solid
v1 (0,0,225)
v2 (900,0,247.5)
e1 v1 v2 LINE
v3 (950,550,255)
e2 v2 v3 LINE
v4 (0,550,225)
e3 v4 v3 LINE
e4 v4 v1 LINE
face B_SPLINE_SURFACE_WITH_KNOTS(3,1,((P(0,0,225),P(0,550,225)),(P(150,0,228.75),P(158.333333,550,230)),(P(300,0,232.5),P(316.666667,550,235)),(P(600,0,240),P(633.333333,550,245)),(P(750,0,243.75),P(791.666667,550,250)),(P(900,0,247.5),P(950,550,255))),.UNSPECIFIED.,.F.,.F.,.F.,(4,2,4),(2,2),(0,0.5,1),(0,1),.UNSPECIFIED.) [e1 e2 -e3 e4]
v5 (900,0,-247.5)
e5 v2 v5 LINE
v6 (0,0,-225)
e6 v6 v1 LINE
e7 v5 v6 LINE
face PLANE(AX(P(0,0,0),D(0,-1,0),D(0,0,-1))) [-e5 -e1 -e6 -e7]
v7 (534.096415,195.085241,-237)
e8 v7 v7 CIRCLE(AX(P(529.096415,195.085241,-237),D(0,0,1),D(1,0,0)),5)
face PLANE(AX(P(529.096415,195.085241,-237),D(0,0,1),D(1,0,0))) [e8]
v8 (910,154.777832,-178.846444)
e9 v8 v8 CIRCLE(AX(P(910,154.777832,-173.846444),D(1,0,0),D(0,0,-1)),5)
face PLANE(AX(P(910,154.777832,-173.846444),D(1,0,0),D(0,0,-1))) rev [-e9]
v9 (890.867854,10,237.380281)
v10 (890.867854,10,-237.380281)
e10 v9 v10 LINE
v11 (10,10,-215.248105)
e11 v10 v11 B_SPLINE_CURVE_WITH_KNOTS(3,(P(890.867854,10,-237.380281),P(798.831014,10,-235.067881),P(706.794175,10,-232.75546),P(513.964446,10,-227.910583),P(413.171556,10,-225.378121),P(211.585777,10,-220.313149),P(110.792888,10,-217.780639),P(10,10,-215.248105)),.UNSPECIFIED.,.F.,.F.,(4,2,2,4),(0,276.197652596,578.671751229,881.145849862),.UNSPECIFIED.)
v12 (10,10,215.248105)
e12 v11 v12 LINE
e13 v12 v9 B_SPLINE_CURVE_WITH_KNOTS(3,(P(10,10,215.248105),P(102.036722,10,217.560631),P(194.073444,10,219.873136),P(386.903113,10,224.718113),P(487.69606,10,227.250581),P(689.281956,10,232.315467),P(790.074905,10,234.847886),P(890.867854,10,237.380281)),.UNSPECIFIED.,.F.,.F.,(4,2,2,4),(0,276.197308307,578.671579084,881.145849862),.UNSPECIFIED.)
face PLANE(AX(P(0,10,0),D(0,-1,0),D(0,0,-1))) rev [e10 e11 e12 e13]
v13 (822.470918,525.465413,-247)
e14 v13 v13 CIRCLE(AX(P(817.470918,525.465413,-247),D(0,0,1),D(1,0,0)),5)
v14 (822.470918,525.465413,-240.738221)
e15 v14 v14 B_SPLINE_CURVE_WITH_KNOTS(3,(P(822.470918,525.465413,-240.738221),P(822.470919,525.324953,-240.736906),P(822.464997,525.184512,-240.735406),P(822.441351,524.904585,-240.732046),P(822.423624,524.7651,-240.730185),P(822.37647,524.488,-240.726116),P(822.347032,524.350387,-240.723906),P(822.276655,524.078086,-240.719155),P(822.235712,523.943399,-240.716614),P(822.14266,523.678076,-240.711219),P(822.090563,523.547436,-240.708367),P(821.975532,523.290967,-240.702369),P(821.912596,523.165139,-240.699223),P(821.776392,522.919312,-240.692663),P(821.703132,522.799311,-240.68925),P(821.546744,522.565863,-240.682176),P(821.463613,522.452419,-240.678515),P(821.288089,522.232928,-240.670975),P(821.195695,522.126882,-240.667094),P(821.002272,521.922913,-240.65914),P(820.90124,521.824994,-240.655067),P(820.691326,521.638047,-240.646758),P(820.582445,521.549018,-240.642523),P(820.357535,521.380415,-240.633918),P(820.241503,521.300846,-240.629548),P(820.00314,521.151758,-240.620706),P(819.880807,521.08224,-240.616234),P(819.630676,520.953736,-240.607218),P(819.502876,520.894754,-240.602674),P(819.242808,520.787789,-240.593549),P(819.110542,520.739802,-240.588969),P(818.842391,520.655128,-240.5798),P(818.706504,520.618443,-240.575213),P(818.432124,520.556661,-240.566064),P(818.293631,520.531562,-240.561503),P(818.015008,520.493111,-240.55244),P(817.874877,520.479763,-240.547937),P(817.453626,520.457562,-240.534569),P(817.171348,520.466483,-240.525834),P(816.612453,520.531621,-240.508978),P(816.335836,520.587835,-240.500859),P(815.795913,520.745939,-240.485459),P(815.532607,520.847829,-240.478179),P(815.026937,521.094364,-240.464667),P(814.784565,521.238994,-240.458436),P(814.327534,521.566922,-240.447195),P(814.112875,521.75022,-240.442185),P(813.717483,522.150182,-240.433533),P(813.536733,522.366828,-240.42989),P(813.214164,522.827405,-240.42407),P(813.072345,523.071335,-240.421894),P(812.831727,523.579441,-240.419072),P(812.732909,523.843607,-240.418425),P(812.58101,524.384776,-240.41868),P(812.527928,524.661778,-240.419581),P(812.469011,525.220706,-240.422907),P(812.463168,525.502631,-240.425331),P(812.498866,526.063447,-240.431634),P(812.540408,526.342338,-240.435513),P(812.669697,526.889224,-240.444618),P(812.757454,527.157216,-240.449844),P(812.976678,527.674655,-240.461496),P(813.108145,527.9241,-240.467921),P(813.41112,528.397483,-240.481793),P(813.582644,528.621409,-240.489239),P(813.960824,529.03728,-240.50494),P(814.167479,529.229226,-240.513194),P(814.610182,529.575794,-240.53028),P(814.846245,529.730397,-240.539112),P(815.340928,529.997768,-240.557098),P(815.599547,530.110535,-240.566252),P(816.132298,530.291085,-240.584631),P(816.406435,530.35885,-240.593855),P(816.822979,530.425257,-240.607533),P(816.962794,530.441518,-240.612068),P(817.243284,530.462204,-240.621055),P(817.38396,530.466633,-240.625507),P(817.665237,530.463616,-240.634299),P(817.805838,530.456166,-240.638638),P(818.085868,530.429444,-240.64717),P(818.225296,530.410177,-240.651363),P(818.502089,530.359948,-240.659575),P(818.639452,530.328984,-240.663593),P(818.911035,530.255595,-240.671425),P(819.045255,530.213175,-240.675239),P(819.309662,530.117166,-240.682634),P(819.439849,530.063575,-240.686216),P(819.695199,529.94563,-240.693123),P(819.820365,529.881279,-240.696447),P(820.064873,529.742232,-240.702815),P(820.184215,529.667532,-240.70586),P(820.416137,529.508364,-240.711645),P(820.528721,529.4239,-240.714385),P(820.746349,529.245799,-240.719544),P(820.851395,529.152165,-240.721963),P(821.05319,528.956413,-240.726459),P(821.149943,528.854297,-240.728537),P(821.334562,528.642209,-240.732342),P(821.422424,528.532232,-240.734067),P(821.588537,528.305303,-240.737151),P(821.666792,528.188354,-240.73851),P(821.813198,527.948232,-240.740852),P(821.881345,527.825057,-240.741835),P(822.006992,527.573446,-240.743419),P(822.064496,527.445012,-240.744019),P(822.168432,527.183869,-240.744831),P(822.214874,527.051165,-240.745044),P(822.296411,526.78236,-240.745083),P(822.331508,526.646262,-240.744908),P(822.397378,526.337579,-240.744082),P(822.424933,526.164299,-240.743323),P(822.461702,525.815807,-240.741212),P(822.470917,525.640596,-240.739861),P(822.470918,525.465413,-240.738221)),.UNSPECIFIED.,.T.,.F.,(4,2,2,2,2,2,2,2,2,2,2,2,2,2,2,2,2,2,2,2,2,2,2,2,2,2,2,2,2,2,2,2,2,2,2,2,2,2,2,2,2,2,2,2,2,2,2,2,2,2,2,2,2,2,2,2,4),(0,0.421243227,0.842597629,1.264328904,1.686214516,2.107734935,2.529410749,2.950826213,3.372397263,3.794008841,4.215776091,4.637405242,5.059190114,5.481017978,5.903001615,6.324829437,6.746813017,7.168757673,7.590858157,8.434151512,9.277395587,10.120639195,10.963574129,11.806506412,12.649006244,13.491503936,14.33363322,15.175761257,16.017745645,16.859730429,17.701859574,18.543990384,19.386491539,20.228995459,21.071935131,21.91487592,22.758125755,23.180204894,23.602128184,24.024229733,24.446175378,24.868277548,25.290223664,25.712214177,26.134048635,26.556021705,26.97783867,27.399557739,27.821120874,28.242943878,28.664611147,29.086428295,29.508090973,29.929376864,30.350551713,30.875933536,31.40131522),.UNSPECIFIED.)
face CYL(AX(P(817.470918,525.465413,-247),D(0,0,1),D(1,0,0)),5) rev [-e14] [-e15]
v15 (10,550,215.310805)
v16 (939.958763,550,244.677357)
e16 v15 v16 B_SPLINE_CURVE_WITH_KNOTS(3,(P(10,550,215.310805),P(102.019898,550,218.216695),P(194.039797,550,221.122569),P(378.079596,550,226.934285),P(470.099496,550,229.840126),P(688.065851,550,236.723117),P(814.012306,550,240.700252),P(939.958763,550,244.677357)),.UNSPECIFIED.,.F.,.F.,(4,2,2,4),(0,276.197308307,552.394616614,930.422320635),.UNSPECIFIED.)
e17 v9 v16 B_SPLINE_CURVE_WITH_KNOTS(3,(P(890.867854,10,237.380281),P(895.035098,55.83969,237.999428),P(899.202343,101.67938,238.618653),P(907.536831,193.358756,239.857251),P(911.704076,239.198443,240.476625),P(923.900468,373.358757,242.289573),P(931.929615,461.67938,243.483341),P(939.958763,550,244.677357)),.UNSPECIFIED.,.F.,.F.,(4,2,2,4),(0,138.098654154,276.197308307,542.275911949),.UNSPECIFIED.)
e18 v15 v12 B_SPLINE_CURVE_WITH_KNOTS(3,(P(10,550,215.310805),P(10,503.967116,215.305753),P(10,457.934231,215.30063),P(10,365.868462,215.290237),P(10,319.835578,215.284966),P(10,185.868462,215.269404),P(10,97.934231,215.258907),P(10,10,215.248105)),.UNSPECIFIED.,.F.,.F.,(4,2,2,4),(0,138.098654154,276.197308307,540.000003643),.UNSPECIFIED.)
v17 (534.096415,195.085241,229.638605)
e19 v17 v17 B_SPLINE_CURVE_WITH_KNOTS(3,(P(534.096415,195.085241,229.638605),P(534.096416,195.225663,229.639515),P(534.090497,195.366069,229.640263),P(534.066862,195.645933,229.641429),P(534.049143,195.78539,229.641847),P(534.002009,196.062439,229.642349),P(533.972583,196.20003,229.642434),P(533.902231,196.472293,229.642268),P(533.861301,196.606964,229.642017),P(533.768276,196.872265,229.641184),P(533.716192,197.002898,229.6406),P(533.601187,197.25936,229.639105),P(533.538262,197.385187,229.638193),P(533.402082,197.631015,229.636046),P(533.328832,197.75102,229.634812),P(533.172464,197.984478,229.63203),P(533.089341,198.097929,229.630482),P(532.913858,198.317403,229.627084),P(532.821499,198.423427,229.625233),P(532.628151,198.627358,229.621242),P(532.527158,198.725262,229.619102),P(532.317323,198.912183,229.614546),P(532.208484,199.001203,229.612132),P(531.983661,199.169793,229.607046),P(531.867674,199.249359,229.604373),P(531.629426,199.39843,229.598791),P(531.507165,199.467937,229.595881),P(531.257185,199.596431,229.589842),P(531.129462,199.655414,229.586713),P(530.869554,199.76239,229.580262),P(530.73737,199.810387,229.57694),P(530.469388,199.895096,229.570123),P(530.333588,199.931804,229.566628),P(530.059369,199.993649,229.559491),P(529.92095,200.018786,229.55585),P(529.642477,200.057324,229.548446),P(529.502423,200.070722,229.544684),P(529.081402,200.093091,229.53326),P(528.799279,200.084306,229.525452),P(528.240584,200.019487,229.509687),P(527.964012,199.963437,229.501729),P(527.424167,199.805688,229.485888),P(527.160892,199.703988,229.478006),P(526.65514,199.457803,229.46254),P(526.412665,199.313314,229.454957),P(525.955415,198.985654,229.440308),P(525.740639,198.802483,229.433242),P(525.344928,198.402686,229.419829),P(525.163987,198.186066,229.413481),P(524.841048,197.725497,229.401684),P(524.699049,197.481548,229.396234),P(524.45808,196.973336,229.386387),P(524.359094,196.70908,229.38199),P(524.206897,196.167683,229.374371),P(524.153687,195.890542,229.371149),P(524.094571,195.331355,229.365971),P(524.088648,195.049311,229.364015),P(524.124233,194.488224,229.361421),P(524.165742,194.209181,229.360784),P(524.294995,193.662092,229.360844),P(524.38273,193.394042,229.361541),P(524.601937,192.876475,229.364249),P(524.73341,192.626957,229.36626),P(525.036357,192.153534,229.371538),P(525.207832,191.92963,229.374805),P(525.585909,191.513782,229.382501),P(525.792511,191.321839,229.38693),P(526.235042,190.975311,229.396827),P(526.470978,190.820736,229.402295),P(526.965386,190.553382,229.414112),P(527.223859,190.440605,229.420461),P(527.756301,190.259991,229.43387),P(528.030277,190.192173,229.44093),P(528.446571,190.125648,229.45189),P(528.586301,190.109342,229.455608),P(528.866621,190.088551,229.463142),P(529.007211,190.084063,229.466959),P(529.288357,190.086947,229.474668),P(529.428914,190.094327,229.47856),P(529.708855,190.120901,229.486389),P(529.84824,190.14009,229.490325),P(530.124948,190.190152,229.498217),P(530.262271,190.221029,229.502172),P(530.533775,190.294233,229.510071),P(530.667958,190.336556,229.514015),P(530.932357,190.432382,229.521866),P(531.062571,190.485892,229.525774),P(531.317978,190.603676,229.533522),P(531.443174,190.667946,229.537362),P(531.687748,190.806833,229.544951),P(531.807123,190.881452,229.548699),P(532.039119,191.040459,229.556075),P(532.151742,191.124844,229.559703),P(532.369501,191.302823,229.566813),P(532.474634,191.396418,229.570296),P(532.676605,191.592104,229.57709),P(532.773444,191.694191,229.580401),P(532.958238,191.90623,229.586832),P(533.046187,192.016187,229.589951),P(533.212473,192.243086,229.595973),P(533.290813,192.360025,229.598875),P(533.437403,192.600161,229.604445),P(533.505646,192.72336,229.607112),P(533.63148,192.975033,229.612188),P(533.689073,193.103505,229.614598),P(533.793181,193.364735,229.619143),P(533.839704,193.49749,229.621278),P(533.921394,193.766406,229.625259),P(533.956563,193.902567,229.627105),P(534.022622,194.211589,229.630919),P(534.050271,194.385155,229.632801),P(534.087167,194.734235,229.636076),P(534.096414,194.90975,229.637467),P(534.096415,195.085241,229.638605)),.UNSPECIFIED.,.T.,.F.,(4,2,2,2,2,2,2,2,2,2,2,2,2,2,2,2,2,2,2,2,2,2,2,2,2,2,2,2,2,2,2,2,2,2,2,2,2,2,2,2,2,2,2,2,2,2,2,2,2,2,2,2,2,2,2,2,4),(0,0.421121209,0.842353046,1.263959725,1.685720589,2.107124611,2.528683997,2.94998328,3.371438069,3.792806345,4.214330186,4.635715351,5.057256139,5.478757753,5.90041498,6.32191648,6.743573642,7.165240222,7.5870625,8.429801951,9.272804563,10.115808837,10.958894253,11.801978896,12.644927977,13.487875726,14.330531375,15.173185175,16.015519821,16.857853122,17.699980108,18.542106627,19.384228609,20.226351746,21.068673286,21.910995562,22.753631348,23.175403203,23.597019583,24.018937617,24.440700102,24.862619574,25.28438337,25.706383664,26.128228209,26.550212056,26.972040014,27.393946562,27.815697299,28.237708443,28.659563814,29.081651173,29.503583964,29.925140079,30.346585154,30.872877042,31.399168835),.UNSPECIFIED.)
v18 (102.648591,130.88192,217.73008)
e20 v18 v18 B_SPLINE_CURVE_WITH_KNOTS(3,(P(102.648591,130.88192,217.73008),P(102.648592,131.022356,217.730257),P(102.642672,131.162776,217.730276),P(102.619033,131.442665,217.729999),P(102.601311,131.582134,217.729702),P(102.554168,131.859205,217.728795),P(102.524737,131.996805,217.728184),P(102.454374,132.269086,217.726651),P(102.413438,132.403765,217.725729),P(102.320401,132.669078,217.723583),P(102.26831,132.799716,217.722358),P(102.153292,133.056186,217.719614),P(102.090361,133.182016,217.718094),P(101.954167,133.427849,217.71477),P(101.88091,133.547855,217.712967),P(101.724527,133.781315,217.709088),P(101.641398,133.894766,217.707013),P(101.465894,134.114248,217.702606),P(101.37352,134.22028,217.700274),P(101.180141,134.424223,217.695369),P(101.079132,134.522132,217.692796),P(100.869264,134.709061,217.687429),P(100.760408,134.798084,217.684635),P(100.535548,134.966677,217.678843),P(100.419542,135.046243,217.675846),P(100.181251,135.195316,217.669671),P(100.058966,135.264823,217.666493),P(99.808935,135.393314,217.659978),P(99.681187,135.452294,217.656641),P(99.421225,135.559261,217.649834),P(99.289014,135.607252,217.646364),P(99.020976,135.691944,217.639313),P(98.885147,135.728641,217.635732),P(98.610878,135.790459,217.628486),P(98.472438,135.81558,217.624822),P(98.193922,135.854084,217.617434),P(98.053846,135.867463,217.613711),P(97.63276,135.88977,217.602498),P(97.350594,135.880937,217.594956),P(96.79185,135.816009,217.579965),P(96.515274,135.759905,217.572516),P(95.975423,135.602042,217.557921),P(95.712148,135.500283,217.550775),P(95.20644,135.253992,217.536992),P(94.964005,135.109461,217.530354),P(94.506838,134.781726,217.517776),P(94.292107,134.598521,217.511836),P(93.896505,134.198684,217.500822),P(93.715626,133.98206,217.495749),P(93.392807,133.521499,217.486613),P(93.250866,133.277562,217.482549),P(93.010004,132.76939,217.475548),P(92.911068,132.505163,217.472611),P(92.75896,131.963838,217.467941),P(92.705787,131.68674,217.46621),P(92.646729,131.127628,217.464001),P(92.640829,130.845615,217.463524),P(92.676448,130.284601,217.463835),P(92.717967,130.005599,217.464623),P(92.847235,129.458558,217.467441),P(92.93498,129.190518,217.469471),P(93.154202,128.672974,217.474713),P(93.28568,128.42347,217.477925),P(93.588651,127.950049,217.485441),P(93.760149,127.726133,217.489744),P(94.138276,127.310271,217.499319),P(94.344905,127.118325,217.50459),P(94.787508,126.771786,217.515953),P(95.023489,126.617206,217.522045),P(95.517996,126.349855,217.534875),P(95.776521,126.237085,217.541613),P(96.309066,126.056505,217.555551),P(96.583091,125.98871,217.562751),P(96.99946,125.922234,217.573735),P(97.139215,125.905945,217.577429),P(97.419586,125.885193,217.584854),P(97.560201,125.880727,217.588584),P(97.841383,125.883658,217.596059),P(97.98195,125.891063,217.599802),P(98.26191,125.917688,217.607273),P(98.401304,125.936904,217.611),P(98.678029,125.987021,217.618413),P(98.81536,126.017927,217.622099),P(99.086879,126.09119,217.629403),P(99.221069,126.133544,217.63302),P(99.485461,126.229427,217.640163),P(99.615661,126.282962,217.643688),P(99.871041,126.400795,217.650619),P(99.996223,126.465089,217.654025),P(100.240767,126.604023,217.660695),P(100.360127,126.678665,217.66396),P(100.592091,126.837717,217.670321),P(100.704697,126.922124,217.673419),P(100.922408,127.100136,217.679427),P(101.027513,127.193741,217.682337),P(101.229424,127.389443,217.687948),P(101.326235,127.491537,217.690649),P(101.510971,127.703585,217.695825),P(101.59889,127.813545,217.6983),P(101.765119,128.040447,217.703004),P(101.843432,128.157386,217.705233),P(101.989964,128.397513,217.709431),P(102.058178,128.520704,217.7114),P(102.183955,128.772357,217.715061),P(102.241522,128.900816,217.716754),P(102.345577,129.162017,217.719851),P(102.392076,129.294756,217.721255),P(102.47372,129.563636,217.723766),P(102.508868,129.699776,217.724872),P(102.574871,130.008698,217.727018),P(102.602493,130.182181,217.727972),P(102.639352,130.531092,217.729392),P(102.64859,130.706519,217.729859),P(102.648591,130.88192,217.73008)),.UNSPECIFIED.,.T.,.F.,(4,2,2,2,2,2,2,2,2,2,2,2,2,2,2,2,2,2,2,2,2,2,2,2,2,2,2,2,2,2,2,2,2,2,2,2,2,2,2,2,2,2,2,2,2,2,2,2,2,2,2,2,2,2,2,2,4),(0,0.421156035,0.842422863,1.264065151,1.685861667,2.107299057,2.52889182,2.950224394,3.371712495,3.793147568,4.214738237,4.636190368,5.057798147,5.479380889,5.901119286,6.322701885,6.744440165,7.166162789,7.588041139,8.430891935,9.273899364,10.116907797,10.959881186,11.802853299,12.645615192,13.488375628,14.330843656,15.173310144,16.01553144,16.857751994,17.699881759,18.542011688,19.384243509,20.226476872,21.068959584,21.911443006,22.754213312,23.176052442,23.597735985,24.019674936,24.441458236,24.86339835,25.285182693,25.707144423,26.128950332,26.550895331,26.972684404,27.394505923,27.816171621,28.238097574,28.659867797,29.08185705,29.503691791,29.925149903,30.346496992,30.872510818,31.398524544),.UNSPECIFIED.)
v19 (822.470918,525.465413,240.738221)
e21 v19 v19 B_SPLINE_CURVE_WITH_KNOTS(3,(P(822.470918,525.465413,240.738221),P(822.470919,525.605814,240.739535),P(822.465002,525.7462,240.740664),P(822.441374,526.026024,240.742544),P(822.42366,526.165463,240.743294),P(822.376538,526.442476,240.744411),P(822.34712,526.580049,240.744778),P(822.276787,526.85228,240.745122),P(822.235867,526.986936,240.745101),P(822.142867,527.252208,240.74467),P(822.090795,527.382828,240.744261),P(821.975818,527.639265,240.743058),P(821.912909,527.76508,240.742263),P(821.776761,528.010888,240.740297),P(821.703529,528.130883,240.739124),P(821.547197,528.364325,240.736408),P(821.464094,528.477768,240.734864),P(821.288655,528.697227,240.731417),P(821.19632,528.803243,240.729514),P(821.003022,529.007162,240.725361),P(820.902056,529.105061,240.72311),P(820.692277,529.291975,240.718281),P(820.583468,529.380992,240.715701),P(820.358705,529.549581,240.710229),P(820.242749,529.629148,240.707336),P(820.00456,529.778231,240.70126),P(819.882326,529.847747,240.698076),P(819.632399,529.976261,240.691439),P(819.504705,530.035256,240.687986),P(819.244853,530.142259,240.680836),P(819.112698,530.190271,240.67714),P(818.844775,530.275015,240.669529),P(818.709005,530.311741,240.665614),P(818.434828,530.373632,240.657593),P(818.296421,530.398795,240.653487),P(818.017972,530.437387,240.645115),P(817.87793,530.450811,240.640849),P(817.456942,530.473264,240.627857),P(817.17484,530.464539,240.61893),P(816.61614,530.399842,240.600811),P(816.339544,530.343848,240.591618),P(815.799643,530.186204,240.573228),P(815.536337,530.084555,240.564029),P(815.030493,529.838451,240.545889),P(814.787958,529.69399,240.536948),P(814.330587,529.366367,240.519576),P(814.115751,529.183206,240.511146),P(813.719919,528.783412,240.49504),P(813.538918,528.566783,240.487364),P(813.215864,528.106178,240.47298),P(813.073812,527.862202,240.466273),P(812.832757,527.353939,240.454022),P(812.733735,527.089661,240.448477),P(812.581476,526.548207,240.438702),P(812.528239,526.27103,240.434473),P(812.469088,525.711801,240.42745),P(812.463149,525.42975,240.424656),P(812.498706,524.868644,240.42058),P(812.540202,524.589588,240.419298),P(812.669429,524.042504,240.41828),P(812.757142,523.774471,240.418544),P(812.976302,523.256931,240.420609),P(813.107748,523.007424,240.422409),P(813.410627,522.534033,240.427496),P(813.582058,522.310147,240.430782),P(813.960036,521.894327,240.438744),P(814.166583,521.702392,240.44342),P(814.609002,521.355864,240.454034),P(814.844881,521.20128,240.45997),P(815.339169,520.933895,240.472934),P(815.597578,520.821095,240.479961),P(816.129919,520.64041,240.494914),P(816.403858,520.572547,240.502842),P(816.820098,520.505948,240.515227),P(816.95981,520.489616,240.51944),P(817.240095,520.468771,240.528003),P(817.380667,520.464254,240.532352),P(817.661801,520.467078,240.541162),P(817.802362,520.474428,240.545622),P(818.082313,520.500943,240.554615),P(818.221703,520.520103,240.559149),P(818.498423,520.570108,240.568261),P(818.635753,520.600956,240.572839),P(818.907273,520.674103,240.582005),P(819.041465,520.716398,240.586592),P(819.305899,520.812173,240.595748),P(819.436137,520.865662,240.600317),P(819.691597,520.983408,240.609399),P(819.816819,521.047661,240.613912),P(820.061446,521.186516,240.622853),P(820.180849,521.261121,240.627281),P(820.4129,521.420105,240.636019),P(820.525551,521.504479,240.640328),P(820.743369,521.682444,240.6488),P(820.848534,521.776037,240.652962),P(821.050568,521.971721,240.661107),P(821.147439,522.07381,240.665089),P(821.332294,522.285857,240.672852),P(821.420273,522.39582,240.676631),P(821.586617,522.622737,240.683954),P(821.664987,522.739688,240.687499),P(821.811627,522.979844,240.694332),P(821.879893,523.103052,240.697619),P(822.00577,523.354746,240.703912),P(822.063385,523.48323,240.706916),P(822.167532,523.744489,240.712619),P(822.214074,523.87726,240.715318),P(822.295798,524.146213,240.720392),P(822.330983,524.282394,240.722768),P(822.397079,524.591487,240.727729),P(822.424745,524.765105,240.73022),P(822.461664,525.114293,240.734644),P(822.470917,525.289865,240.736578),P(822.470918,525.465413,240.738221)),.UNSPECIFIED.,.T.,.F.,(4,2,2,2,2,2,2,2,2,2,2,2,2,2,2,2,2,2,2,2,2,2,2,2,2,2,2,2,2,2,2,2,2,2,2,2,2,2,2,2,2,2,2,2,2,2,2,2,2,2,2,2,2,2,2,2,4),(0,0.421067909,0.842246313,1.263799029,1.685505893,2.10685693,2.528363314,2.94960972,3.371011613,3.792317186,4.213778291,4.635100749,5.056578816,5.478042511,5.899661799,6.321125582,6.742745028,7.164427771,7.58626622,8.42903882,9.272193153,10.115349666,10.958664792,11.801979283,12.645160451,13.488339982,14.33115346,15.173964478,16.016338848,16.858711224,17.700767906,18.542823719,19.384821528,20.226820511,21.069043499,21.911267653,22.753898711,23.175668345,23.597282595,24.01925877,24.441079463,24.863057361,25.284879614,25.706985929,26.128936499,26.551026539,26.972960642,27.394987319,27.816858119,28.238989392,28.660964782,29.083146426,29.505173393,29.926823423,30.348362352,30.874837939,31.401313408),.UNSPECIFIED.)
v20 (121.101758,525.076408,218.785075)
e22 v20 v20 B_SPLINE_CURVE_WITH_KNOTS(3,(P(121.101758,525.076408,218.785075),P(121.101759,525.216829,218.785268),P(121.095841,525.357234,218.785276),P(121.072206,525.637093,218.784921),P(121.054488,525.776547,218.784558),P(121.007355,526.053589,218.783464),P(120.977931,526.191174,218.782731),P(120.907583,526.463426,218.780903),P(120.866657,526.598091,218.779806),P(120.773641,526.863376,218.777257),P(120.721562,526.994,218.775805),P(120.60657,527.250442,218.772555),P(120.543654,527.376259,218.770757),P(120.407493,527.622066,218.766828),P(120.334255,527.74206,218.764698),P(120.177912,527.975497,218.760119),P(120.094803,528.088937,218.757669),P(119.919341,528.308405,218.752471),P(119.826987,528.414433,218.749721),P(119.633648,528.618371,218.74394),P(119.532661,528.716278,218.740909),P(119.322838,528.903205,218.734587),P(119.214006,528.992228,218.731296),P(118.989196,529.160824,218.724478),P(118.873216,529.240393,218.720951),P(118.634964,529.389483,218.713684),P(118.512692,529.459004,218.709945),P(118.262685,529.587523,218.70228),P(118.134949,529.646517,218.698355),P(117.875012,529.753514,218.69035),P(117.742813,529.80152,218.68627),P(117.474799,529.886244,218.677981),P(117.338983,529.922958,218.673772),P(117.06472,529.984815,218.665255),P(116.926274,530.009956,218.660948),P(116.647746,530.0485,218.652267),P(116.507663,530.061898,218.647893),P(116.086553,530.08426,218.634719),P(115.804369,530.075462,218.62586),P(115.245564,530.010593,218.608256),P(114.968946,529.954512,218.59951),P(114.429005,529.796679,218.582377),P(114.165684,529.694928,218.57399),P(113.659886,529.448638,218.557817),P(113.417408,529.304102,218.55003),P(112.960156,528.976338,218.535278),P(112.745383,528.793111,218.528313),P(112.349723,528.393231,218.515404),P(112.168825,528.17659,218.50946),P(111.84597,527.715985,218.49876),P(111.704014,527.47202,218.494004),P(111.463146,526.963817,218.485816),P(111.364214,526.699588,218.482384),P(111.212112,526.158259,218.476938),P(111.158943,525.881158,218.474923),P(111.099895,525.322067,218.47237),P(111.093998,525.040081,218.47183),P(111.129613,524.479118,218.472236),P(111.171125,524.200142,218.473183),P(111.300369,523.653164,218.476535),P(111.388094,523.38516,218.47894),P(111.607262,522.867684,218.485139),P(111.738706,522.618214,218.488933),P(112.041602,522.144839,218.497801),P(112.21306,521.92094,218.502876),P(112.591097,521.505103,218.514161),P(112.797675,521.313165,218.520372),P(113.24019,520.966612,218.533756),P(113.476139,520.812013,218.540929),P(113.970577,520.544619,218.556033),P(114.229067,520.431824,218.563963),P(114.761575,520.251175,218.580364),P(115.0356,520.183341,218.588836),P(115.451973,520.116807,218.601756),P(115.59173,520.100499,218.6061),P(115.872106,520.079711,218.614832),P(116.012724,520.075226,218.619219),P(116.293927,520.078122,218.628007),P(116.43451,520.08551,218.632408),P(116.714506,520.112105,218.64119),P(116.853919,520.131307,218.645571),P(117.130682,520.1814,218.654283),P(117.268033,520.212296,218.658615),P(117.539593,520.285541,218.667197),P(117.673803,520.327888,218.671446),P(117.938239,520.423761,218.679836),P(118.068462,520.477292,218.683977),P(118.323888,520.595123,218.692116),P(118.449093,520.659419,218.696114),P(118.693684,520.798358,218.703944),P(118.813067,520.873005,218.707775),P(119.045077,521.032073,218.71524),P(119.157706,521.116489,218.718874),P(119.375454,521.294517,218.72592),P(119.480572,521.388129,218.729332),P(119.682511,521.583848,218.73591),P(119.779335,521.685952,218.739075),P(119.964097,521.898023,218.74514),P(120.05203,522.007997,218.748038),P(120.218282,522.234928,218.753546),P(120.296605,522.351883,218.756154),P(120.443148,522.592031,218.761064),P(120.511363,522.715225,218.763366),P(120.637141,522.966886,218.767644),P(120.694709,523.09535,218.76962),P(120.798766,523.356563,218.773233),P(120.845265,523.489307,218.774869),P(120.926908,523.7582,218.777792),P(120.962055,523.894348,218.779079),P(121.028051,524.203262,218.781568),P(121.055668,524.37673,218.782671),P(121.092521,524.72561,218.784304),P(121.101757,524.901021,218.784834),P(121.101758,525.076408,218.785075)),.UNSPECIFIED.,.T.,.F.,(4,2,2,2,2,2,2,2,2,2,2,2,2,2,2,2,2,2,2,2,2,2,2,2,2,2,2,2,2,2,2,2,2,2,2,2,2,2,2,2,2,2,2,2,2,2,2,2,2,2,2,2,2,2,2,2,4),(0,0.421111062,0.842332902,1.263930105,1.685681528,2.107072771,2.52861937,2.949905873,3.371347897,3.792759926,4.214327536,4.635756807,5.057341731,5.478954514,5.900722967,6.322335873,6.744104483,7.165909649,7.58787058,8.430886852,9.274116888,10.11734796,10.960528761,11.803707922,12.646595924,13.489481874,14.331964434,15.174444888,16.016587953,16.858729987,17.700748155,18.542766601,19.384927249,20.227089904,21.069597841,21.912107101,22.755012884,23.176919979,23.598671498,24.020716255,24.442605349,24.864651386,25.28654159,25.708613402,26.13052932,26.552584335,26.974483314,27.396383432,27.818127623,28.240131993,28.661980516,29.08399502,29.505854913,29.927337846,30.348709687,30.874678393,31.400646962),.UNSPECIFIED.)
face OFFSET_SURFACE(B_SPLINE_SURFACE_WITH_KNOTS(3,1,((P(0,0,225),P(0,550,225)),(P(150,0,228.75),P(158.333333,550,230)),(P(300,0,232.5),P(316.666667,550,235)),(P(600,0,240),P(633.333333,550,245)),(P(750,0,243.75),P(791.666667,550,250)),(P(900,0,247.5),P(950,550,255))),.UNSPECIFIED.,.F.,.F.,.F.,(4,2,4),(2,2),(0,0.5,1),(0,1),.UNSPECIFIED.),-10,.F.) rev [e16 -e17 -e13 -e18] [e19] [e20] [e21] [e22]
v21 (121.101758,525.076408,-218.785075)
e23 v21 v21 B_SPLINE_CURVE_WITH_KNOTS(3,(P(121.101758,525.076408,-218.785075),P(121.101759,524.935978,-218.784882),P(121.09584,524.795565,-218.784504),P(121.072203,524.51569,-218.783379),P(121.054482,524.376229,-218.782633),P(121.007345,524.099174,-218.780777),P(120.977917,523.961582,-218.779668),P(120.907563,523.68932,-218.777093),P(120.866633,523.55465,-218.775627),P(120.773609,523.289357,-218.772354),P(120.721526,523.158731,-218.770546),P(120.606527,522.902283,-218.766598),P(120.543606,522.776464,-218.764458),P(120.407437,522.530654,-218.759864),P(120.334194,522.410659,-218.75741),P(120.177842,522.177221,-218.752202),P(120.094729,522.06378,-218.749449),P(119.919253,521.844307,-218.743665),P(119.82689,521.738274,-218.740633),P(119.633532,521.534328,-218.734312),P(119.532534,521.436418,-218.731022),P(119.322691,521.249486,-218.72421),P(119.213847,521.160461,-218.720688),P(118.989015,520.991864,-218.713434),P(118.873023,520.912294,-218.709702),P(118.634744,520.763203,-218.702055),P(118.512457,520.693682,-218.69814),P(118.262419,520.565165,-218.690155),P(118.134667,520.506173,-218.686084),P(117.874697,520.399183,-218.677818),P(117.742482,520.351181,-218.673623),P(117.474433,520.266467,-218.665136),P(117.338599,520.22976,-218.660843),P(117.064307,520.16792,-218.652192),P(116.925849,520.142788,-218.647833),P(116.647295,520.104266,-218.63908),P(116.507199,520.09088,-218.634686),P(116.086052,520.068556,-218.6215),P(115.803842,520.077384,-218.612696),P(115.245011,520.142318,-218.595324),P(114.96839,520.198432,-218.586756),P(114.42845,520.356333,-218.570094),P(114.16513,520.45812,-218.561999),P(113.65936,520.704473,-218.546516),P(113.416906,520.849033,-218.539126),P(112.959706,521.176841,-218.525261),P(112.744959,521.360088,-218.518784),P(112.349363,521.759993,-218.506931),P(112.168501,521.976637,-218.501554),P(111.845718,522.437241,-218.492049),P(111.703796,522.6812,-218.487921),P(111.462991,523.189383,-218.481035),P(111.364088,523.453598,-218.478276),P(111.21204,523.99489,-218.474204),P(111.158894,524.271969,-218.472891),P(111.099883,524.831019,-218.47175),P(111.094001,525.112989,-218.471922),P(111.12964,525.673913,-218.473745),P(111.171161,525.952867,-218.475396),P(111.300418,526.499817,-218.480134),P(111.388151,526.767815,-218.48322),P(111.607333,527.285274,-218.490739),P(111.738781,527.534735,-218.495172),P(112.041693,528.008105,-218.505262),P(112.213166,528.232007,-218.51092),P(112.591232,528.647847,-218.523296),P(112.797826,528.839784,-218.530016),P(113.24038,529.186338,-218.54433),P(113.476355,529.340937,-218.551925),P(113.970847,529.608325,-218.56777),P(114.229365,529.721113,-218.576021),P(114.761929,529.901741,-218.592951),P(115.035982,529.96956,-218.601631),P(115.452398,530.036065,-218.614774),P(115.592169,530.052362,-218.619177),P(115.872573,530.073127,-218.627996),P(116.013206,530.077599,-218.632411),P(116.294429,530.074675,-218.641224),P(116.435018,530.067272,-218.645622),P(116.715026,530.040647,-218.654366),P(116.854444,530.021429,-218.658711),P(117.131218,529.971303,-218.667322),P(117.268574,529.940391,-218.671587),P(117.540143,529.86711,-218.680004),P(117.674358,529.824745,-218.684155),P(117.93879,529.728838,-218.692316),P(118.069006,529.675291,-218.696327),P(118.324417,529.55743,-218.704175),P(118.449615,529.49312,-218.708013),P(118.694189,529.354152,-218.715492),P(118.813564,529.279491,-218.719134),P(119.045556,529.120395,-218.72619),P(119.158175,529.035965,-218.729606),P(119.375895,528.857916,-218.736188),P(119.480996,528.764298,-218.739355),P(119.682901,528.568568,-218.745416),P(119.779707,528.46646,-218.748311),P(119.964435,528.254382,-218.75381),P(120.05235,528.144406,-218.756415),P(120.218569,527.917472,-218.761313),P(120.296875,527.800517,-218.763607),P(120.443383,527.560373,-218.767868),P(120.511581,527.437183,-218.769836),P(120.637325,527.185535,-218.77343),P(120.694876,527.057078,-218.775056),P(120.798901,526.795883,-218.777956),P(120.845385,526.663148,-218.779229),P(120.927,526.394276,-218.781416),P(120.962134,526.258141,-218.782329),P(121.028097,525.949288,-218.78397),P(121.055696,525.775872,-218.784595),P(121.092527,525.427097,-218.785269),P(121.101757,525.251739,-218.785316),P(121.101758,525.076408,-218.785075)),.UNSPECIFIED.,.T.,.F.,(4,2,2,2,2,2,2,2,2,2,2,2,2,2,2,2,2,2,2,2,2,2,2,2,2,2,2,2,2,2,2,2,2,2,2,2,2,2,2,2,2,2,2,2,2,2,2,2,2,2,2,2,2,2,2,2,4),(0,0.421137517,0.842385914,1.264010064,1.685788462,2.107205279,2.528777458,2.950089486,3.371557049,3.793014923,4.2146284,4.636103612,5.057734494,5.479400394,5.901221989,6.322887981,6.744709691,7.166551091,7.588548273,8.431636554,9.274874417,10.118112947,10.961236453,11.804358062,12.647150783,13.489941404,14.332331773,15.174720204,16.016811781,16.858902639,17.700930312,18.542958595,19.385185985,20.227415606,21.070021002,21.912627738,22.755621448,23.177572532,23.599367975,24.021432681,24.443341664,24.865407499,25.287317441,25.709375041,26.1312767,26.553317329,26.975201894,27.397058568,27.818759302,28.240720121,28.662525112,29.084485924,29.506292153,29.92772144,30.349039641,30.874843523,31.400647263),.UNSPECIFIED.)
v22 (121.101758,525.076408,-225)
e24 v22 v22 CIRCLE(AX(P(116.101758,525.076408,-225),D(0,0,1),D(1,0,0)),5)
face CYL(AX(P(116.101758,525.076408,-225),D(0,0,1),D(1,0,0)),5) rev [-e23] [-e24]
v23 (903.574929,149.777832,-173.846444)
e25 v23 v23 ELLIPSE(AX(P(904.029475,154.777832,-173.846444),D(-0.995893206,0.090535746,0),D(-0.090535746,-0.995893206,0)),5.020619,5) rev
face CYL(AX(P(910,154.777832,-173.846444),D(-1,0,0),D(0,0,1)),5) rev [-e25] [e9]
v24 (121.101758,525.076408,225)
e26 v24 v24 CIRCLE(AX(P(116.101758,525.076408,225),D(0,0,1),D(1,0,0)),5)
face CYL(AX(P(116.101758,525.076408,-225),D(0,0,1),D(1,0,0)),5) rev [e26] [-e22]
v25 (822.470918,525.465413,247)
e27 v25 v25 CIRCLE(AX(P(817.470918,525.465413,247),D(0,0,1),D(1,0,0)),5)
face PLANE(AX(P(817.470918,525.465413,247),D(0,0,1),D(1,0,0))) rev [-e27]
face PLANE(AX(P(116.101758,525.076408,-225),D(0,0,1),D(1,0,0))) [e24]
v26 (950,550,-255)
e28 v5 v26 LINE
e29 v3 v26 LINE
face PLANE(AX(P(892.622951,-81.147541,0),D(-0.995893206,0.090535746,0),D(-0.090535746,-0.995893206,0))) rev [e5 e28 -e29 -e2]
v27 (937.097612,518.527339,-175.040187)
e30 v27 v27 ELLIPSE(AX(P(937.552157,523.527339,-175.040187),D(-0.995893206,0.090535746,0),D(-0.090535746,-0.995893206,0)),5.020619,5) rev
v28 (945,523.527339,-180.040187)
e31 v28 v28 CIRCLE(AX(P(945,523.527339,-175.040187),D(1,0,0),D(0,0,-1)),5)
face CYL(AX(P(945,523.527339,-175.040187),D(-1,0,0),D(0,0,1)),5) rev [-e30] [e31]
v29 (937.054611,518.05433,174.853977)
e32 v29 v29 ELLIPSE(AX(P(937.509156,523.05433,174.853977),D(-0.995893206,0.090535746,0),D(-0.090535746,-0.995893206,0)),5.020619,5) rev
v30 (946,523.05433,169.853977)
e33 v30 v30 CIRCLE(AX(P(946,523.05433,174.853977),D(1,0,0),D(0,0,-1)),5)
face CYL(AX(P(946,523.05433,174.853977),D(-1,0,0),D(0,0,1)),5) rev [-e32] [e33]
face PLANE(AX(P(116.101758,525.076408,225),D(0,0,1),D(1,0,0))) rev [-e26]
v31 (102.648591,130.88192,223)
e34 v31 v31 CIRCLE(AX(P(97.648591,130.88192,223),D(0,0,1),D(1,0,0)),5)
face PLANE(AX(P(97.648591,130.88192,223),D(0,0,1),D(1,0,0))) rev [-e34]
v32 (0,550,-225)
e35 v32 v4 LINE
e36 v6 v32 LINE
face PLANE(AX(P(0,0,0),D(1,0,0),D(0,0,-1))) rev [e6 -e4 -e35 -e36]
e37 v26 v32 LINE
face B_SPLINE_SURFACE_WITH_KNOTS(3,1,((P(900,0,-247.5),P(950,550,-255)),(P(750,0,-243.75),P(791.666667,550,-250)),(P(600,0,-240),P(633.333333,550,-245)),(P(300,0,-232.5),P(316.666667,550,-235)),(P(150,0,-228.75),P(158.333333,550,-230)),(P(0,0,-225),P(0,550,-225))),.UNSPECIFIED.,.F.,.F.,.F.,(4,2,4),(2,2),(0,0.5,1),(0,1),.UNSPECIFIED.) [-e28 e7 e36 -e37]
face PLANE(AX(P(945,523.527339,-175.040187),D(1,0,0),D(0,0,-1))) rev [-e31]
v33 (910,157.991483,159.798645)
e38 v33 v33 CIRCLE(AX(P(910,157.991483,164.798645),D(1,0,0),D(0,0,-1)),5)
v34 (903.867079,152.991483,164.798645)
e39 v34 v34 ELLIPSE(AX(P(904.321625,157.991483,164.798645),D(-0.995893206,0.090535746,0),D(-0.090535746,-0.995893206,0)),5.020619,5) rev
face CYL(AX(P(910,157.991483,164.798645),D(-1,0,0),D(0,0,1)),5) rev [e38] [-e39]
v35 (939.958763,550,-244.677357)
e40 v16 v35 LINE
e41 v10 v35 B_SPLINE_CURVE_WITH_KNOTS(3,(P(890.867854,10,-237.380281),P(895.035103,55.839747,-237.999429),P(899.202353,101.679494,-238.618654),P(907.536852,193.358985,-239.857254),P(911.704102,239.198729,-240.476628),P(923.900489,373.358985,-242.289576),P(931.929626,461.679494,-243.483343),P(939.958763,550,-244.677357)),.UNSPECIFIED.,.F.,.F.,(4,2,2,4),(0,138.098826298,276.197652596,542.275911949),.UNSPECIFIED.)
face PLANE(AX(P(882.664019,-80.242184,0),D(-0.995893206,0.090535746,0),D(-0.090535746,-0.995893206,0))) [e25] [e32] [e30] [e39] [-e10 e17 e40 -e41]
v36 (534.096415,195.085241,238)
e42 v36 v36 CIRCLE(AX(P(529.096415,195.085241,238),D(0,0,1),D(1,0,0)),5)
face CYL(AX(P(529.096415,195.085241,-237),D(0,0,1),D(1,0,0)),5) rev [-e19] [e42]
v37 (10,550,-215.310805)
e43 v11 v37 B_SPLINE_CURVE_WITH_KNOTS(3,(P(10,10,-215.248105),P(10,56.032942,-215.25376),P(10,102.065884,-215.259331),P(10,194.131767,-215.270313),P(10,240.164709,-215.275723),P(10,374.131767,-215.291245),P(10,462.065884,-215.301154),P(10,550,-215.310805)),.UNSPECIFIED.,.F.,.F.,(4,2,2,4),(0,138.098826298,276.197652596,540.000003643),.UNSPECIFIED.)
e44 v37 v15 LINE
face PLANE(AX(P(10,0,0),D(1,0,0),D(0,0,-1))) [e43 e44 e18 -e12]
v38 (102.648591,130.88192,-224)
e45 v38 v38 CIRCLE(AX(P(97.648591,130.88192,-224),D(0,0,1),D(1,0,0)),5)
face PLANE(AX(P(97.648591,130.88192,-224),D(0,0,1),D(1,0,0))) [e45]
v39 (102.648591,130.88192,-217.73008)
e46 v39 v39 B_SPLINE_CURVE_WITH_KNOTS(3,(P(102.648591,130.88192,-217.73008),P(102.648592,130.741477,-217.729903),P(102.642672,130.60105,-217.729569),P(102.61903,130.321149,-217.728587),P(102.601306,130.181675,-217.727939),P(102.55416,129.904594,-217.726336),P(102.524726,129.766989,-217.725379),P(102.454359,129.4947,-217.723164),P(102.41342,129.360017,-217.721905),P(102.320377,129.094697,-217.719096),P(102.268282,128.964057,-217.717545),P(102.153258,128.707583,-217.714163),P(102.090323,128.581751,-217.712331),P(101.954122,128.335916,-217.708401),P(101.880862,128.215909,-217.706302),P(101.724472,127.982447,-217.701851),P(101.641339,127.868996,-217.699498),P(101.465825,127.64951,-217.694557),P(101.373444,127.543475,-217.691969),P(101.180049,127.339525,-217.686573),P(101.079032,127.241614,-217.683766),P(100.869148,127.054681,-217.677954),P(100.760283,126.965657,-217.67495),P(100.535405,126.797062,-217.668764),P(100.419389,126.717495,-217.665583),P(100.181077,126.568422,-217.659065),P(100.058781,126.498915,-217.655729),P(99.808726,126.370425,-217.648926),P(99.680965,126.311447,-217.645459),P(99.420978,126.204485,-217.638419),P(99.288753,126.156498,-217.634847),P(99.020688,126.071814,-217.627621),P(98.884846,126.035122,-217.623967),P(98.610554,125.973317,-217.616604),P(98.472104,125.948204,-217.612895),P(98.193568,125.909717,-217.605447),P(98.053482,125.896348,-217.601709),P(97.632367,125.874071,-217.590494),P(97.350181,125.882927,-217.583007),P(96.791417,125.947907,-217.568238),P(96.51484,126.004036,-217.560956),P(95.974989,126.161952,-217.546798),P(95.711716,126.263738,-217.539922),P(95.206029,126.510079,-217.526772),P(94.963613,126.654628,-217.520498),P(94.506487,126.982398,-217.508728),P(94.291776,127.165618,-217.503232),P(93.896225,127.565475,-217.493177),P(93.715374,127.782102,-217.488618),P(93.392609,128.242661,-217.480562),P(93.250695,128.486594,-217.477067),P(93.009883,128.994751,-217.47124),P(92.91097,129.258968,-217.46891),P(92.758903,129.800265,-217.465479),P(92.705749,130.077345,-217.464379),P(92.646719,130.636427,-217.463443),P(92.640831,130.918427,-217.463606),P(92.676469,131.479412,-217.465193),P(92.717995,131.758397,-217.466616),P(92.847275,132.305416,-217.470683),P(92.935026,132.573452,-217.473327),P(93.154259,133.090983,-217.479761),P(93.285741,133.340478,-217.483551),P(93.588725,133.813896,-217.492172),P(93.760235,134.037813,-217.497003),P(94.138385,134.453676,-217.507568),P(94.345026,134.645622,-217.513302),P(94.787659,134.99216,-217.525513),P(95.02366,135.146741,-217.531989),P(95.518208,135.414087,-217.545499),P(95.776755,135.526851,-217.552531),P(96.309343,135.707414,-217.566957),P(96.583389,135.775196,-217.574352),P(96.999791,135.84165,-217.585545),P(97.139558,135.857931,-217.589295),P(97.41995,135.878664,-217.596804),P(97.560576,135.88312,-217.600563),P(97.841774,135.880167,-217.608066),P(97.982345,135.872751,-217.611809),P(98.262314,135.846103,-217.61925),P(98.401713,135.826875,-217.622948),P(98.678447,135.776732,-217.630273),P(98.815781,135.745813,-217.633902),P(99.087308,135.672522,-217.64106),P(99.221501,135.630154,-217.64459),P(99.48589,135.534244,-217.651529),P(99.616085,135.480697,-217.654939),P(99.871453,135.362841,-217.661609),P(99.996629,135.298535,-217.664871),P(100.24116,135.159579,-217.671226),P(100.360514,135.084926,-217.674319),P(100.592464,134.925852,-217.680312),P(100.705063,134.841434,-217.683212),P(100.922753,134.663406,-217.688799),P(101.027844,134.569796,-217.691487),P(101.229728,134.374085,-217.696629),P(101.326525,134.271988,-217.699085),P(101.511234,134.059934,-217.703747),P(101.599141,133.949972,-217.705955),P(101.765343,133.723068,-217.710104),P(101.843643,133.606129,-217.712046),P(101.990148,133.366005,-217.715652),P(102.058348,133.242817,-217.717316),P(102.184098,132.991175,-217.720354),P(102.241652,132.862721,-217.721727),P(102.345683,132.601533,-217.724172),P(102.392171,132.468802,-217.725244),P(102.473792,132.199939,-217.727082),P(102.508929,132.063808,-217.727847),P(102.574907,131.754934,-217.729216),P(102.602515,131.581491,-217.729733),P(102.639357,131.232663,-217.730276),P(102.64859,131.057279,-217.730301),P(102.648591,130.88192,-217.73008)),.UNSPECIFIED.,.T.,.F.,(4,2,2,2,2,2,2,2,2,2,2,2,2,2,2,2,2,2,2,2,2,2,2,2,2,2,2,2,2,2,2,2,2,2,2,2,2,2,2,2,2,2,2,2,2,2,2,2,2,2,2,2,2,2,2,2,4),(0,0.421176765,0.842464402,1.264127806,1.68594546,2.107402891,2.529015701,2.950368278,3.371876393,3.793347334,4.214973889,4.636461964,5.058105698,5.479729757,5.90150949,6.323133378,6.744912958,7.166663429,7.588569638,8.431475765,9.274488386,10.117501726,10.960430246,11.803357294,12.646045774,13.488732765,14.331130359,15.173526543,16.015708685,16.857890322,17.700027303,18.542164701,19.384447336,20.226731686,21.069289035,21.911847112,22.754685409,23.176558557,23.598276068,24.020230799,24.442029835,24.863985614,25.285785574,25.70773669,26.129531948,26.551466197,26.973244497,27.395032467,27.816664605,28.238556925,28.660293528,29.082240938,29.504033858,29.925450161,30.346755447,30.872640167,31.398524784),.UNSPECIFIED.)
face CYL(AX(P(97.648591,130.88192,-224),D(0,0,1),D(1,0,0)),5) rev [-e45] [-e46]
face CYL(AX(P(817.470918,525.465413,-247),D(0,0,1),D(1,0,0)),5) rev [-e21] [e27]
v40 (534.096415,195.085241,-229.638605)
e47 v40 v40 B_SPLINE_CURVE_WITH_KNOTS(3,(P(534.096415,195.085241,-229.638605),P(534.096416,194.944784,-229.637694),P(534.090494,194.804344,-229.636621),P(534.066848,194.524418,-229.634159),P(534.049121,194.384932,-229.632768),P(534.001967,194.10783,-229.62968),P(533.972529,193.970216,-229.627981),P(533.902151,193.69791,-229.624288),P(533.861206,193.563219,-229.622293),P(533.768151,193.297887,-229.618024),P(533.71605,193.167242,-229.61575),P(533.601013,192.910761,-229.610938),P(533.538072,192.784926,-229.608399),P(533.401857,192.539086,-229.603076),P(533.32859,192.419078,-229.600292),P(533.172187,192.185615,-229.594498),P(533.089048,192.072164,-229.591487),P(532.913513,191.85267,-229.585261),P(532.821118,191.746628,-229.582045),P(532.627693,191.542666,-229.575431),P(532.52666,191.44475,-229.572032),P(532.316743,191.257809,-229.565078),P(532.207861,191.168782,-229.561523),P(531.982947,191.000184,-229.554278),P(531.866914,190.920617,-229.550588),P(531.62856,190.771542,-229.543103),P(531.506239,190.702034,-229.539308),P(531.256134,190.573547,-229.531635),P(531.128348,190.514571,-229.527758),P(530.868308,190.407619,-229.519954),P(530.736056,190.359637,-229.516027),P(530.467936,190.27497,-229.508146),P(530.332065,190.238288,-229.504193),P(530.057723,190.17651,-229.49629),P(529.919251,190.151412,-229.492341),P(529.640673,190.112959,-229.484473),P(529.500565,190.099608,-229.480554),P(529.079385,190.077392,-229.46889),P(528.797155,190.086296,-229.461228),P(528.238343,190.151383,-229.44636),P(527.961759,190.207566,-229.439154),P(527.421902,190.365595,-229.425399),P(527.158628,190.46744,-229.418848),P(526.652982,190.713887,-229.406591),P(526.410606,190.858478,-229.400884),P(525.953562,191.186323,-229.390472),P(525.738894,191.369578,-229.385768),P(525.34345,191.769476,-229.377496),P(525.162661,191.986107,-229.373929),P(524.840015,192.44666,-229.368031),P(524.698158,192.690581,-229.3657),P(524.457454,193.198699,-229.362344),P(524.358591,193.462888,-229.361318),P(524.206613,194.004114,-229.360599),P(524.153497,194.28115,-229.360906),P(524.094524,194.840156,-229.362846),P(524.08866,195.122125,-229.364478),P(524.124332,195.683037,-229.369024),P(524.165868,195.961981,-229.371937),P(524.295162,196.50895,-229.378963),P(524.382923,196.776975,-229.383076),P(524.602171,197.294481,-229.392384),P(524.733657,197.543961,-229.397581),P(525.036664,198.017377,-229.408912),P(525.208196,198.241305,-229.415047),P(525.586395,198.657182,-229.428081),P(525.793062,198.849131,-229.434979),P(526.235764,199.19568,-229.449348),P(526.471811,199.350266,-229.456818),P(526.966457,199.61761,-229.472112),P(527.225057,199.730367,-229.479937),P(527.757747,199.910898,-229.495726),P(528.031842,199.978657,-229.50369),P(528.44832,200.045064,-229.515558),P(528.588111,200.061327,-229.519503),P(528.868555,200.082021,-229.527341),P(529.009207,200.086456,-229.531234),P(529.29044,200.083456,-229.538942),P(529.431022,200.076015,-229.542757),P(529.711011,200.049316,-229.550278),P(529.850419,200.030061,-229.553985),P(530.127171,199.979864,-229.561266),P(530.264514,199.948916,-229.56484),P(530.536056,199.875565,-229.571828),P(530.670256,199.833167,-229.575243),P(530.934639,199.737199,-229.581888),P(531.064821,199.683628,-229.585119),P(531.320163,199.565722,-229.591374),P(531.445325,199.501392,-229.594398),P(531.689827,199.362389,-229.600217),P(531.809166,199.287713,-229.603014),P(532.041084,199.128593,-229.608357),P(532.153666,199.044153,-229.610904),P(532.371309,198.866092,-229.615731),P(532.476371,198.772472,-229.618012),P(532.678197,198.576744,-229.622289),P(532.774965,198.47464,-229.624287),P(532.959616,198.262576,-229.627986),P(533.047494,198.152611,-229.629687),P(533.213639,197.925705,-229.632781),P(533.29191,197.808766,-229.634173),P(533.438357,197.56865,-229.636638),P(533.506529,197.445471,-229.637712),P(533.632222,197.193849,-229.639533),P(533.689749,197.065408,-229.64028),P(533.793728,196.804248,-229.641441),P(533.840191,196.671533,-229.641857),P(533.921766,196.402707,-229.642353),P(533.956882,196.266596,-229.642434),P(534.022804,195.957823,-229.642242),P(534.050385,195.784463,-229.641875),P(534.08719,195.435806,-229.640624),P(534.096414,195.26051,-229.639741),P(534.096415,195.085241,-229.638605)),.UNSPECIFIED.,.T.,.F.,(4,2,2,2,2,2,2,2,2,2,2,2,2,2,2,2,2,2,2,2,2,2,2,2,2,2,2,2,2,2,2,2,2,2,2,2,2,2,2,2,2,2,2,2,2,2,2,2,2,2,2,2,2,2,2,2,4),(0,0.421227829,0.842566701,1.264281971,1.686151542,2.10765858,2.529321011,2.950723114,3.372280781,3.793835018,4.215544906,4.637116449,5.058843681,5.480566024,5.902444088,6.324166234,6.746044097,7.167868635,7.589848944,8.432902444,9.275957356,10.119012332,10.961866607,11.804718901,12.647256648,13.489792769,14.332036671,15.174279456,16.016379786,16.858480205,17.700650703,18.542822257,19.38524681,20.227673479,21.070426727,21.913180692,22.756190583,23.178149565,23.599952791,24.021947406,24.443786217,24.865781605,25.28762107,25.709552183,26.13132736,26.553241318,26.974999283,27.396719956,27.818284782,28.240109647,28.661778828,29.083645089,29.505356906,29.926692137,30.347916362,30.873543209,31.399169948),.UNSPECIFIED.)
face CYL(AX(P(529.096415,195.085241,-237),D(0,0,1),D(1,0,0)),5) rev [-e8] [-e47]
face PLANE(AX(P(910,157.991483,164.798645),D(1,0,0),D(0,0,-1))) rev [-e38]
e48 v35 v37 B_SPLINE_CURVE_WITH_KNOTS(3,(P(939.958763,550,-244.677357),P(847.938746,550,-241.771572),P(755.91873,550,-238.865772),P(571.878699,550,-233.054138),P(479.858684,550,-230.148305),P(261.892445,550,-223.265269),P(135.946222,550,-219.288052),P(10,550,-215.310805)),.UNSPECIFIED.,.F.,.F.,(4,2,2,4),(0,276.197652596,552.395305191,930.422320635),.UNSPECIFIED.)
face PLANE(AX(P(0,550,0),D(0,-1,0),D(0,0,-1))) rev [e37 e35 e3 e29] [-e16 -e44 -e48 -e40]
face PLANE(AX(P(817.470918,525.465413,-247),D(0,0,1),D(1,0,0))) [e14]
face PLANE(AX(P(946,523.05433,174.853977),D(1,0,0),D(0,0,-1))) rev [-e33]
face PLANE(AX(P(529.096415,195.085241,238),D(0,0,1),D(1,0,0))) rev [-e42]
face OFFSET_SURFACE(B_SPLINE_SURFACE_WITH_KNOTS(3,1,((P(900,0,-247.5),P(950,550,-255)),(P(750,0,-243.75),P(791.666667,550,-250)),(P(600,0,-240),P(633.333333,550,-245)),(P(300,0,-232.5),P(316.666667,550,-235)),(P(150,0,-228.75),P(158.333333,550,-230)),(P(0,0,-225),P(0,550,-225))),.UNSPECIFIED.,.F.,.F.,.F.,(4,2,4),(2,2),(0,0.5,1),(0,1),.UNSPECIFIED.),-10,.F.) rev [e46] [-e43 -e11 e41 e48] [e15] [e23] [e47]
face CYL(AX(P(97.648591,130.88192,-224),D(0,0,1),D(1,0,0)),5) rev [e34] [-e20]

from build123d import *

# Parameters (mm, degrees)
CASCA4_T                = -10
CUT_EXTRUDE3_DEPTH      = 23
CUT_EXTRUDE3_DEPTH_BACK = 452
SKETCH3_R               = 5
CUT_EXTRUDE4_DEPTH      = 8
CUT_EXTRUDE4_DEPTH_BACK = 439
SKETCH4_R               = 5
SKETCH5_R               = 5
CUT_EXTRUDE5_DEPTH      = 55
SKETCH6_R               = 5
CUT_EXTRUDE6_DEPTH      = 56
SKETCH8_R               = 5
CUT_EXTRUDE7_DEPTH      = 20
SKETCH9_R               = 5
CUT_EXTRUDE8_DEPTH      = 20


with BuildPart() as part:
    # Esboço1 → Loft3 section 0
    with BuildSketch(Plane(origin=(0, 0, 0), x_dir=(1, 0, 0), z_dir=(0, 1, 0))):
        with BuildLine():
            Line((0, 225), (0, -225))
            Line((0, -225), (900, -247.5))
            Line((900, -247.5), (900, 247.5))
            Line((900, 247.5), (0, 225))
        make_face()
    # Esboço2 → Loft3 section 1
    with BuildSketch(Plane(origin=(0, 550, 0), x_dir=(1, 0, 0), z_dir=(0, 1, 0))):
        with BuildLine():
            Line((0, 225), (0, -225))
            Line((0, -225), (950, -255))
            Line((950, -255), (950, 255))
            Line((950, 255), (0, 225))
        make_face()
    loft()

    # Casca4
    casca4_openings = [part.faces().sort_by_distance(p)[0] for p in [
        (484.895833333, 550, 0),
    ]]
    offset(amount=CASCA4_T, openings=casca4_openings, kind=Kind.INTERSECTION)

    # Cut-Extrude1: read off the stored shape, not the designer's step
    # Cut-Extrude1: loft between two sections, ruled curve by curve
    cut_extrude1_from = [
        Edge.make_three_point_arc((121.101758385, 525.076407947, -225), (116.101758385, 530.076407947, -225), (111.101758385, 525.076407947, -225)),
        Edge.make_three_point_arc((111.101758385, 525.076407947, -225), (116.101758385, 520.076407947, -225), (121.101758385, 525.076407947, -225)),
    ]
    cut_extrude1_to = [
        Edge.make_three_point_arc((121.101758385, 525.076407947, -218.471984374), (116.101758385, 530.076407947, -218.471984374), (111.101758385, 525.076407947, -218.471984374)),
        Edge.make_three_point_arc((111.101758385, 525.076407947, -218.471984374), (116.101758385, 520.076407947, -218.471984374), (121.101758385, 525.076407947, -218.471984374)),
    ]
    cut_extrude1 = Solid(Shell([*[Face.make_surface_from_curves(cut_extrude1_from[k], cut_extrude1_to[k]) for k in range(2)], Face(Wire(cut_extrude1_from)), Face(Wire(cut_extrude1_to))]))
    add(cut_extrude1, mode=Mode.SUBTRACT)

    # Cut-Extrude1 2: loft between two sections, ruled curve by curve
    cut_extrude1_2_from = [
        Edge.make_three_point_arc((121.101758385, 525.076407947, 218.471984384), (116.101758385, 530.076407947, 218.471984384), (111.101758385, 525.076407947, 218.471984384)),
        Edge.make_three_point_arc((111.101758385, 525.076407947, 218.471984384), (116.101758385, 520.076407947, 218.471984384), (121.101758385, 525.076407947, 218.471984384)),
    ]
    cut_extrude1_2_to = [
        Edge.make_three_point_arc((121.101758385, 525.076407947, 225), (116.101758385, 530.076407947, 225), (111.101758385, 525.076407947, 225)),
        Edge.make_three_point_arc((111.101758385, 525.076407947, 225), (116.101758385, 520.076407947, 225), (121.101758385, 525.076407947, 225)),
    ]
    cut_extrude1_2 = Solid(Shell([*[Face.make_surface_from_curves(cut_extrude1_2_from[k], cut_extrude1_2_to[k]) for k in range(2)], Face(Wire(cut_extrude1_2_from)), Face(Wire(cut_extrude1_2_to))]))
    add(cut_extrude1_2, mode=Mode.SUBTRACT)

    # Cut-Extrude2: read off the stored shape, not the designer's step
    # Cut-Extrude2: loft between two sections, ruled curve by curve
    cut_extrude2_from = [
        Edge.make_three_point_arc((822.470918457, 525.465412678, -247), (817.470918457, 530.465412678, -247), (812.470918457, 525.465412678, -247)),
        Edge.make_three_point_arc((812.470918457, 525.465412678, -247), (817.470918457, 520.465412678, -247), (822.470918457, 525.465412678, -247)),
    ]
    cut_extrude2_to = [
        Edge.make_three_point_arc((822.470918457, 525.465412678, -240.418518829), (817.470918457, 530.465412678, -240.418518829), (812.470918457, 525.465412678, -240.418518829)),
        Edge.make_three_point_arc((812.470918457, 525.465412678, -240.418518829), (817.470918457, 520.465412678, -240.418518829), (822.470918457, 525.465412678, -240.418518829)),
    ]
    cut_extrude2 = Solid(Shell([*[Face.make_surface_from_curves(cut_extrude2_from[k], cut_extrude2_to[k]) for k in range(2)], Face(Wire(cut_extrude2_from)), Face(Wire(cut_extrude2_to))]))
    add(cut_extrude2, mode=Mode.SUBTRACT)

    # Cut-Extrude2 2: loft between two sections, ruled curve by curve
    cut_extrude2_2_from = [
        Edge.make_three_point_arc((822.470918457, 525.465412678, 240.418519067), (817.470918457, 530.465412678, 240.418519067), (812.470918457, 525.465412678, 240.418519067)),
        Edge.make_three_point_arc((812.470918457, 525.465412678, 240.418519067), (817.470918457, 520.465412678, 240.418519067), (822.470918457, 525.465412678, 240.418519067)),
    ]
    cut_extrude2_2_to = [
        Edge.make_three_point_arc((822.470918457, 525.465412678, 247), (817.470918457, 530.465412678, 247), (812.470918457, 525.465412678, 247)),
        Edge.make_three_point_arc((812.470918457, 525.465412678, 247), (817.470918457, 520.465412678, 247), (822.470918457, 525.465412678, 247)),
    ]
    cut_extrude2_2 = Solid(Shell([*[Face.make_surface_from_curves(cut_extrude2_2_from[k], cut_extrude2_2_to[k]) for k in range(2)], Face(Wire(cut_extrude2_2_from)), Face(Wire(cut_extrude2_2_to))]))
    add(cut_extrude2_2, mode=Mode.SUBTRACT)

    # Sketch3 → Cut-Extrude3 (cut, two sides: drawn at the far end of the back side and taken through both)
    with BuildSketch(Plane.XY.offset(215).offset(-CUT_EXTRUDE3_DEPTH_BACK)):
        with Locations((529.096415143, 195.085241143)):
            Circle(SKETCH3_R)
    extrude(amount=CUT_EXTRUDE3_DEPTH + CUT_EXTRUDE3_DEPTH_BACK, mode=Mode.SUBTRACT)

    # Sketch4 → Cut-Extrude4 (cut, two sides: drawn at the far end of the back side and taken through both)
    with BuildSketch(Plane.XY.offset(215).offset(-CUT_EXTRUDE4_DEPTH_BACK)):
        with Locations((97.648591279, 130.881920188)):
            Circle(SKETCH4_R)
    extrude(amount=CUT_EXTRUDE4_DEPTH + CUT_EXTRUDE4_DEPTH_BACK, mode=Mode.SUBTRACT)

    # Sketch5 → Cut-Extrude5 (cut)
    with BuildSketch(Plane(origin=(890, 0, 0), x_dir=(0, 0, -1), z_dir=(1, 0, 0))):
        with Locations(Location((175.040186522, 523.527338852, 0), (0, 0, 270))):
            Circle(SKETCH5_R)
    extrude(amount=CUT_EXTRUDE5_DEPTH, mode=Mode.SUBTRACT)

    # Sketch6 → Cut-Extrude6 (cut)
    with BuildSketch(Plane(origin=(890, 0, 0), x_dir=(0, 0, -1), z_dir=(1, 0, 0))):
        with Locations(Location((-174.853977213, 523.054329593, 0), (0, 0, 270))):
            Circle(SKETCH6_R)
    extrude(amount=CUT_EXTRUDE6_DEPTH, mode=Mode.SUBTRACT)

    # Sketch8 → Cut-Extrude7 (cut)
    with BuildSketch(Plane(origin=(890, 0, 0), x_dir=(0, 0, -1), z_dir=(1, 0, 0))):
        with Locations(Location((173.846443874, 154.777832346, 0), (0, 0, 270))):
            Circle(SKETCH8_R)
    extrude(amount=CUT_EXTRUDE7_DEPTH, mode=Mode.SUBTRACT)

    # Sketch9 → Cut-Extrude8 (cut)
    with BuildSketch(Plane(origin=(890, 0, 0), x_dir=(0, 0, -1), z_dir=(1, 0, 0))):
        with Locations(Location((-164.798644624, 157.991483325, 0), (0, 0, 270))):
            Circle(SKETCH9_R)
    extrude(amount=CUT_EXTRUDE8_DEPTH, mode=Mode.SUBTRACT)


solid = part.part
